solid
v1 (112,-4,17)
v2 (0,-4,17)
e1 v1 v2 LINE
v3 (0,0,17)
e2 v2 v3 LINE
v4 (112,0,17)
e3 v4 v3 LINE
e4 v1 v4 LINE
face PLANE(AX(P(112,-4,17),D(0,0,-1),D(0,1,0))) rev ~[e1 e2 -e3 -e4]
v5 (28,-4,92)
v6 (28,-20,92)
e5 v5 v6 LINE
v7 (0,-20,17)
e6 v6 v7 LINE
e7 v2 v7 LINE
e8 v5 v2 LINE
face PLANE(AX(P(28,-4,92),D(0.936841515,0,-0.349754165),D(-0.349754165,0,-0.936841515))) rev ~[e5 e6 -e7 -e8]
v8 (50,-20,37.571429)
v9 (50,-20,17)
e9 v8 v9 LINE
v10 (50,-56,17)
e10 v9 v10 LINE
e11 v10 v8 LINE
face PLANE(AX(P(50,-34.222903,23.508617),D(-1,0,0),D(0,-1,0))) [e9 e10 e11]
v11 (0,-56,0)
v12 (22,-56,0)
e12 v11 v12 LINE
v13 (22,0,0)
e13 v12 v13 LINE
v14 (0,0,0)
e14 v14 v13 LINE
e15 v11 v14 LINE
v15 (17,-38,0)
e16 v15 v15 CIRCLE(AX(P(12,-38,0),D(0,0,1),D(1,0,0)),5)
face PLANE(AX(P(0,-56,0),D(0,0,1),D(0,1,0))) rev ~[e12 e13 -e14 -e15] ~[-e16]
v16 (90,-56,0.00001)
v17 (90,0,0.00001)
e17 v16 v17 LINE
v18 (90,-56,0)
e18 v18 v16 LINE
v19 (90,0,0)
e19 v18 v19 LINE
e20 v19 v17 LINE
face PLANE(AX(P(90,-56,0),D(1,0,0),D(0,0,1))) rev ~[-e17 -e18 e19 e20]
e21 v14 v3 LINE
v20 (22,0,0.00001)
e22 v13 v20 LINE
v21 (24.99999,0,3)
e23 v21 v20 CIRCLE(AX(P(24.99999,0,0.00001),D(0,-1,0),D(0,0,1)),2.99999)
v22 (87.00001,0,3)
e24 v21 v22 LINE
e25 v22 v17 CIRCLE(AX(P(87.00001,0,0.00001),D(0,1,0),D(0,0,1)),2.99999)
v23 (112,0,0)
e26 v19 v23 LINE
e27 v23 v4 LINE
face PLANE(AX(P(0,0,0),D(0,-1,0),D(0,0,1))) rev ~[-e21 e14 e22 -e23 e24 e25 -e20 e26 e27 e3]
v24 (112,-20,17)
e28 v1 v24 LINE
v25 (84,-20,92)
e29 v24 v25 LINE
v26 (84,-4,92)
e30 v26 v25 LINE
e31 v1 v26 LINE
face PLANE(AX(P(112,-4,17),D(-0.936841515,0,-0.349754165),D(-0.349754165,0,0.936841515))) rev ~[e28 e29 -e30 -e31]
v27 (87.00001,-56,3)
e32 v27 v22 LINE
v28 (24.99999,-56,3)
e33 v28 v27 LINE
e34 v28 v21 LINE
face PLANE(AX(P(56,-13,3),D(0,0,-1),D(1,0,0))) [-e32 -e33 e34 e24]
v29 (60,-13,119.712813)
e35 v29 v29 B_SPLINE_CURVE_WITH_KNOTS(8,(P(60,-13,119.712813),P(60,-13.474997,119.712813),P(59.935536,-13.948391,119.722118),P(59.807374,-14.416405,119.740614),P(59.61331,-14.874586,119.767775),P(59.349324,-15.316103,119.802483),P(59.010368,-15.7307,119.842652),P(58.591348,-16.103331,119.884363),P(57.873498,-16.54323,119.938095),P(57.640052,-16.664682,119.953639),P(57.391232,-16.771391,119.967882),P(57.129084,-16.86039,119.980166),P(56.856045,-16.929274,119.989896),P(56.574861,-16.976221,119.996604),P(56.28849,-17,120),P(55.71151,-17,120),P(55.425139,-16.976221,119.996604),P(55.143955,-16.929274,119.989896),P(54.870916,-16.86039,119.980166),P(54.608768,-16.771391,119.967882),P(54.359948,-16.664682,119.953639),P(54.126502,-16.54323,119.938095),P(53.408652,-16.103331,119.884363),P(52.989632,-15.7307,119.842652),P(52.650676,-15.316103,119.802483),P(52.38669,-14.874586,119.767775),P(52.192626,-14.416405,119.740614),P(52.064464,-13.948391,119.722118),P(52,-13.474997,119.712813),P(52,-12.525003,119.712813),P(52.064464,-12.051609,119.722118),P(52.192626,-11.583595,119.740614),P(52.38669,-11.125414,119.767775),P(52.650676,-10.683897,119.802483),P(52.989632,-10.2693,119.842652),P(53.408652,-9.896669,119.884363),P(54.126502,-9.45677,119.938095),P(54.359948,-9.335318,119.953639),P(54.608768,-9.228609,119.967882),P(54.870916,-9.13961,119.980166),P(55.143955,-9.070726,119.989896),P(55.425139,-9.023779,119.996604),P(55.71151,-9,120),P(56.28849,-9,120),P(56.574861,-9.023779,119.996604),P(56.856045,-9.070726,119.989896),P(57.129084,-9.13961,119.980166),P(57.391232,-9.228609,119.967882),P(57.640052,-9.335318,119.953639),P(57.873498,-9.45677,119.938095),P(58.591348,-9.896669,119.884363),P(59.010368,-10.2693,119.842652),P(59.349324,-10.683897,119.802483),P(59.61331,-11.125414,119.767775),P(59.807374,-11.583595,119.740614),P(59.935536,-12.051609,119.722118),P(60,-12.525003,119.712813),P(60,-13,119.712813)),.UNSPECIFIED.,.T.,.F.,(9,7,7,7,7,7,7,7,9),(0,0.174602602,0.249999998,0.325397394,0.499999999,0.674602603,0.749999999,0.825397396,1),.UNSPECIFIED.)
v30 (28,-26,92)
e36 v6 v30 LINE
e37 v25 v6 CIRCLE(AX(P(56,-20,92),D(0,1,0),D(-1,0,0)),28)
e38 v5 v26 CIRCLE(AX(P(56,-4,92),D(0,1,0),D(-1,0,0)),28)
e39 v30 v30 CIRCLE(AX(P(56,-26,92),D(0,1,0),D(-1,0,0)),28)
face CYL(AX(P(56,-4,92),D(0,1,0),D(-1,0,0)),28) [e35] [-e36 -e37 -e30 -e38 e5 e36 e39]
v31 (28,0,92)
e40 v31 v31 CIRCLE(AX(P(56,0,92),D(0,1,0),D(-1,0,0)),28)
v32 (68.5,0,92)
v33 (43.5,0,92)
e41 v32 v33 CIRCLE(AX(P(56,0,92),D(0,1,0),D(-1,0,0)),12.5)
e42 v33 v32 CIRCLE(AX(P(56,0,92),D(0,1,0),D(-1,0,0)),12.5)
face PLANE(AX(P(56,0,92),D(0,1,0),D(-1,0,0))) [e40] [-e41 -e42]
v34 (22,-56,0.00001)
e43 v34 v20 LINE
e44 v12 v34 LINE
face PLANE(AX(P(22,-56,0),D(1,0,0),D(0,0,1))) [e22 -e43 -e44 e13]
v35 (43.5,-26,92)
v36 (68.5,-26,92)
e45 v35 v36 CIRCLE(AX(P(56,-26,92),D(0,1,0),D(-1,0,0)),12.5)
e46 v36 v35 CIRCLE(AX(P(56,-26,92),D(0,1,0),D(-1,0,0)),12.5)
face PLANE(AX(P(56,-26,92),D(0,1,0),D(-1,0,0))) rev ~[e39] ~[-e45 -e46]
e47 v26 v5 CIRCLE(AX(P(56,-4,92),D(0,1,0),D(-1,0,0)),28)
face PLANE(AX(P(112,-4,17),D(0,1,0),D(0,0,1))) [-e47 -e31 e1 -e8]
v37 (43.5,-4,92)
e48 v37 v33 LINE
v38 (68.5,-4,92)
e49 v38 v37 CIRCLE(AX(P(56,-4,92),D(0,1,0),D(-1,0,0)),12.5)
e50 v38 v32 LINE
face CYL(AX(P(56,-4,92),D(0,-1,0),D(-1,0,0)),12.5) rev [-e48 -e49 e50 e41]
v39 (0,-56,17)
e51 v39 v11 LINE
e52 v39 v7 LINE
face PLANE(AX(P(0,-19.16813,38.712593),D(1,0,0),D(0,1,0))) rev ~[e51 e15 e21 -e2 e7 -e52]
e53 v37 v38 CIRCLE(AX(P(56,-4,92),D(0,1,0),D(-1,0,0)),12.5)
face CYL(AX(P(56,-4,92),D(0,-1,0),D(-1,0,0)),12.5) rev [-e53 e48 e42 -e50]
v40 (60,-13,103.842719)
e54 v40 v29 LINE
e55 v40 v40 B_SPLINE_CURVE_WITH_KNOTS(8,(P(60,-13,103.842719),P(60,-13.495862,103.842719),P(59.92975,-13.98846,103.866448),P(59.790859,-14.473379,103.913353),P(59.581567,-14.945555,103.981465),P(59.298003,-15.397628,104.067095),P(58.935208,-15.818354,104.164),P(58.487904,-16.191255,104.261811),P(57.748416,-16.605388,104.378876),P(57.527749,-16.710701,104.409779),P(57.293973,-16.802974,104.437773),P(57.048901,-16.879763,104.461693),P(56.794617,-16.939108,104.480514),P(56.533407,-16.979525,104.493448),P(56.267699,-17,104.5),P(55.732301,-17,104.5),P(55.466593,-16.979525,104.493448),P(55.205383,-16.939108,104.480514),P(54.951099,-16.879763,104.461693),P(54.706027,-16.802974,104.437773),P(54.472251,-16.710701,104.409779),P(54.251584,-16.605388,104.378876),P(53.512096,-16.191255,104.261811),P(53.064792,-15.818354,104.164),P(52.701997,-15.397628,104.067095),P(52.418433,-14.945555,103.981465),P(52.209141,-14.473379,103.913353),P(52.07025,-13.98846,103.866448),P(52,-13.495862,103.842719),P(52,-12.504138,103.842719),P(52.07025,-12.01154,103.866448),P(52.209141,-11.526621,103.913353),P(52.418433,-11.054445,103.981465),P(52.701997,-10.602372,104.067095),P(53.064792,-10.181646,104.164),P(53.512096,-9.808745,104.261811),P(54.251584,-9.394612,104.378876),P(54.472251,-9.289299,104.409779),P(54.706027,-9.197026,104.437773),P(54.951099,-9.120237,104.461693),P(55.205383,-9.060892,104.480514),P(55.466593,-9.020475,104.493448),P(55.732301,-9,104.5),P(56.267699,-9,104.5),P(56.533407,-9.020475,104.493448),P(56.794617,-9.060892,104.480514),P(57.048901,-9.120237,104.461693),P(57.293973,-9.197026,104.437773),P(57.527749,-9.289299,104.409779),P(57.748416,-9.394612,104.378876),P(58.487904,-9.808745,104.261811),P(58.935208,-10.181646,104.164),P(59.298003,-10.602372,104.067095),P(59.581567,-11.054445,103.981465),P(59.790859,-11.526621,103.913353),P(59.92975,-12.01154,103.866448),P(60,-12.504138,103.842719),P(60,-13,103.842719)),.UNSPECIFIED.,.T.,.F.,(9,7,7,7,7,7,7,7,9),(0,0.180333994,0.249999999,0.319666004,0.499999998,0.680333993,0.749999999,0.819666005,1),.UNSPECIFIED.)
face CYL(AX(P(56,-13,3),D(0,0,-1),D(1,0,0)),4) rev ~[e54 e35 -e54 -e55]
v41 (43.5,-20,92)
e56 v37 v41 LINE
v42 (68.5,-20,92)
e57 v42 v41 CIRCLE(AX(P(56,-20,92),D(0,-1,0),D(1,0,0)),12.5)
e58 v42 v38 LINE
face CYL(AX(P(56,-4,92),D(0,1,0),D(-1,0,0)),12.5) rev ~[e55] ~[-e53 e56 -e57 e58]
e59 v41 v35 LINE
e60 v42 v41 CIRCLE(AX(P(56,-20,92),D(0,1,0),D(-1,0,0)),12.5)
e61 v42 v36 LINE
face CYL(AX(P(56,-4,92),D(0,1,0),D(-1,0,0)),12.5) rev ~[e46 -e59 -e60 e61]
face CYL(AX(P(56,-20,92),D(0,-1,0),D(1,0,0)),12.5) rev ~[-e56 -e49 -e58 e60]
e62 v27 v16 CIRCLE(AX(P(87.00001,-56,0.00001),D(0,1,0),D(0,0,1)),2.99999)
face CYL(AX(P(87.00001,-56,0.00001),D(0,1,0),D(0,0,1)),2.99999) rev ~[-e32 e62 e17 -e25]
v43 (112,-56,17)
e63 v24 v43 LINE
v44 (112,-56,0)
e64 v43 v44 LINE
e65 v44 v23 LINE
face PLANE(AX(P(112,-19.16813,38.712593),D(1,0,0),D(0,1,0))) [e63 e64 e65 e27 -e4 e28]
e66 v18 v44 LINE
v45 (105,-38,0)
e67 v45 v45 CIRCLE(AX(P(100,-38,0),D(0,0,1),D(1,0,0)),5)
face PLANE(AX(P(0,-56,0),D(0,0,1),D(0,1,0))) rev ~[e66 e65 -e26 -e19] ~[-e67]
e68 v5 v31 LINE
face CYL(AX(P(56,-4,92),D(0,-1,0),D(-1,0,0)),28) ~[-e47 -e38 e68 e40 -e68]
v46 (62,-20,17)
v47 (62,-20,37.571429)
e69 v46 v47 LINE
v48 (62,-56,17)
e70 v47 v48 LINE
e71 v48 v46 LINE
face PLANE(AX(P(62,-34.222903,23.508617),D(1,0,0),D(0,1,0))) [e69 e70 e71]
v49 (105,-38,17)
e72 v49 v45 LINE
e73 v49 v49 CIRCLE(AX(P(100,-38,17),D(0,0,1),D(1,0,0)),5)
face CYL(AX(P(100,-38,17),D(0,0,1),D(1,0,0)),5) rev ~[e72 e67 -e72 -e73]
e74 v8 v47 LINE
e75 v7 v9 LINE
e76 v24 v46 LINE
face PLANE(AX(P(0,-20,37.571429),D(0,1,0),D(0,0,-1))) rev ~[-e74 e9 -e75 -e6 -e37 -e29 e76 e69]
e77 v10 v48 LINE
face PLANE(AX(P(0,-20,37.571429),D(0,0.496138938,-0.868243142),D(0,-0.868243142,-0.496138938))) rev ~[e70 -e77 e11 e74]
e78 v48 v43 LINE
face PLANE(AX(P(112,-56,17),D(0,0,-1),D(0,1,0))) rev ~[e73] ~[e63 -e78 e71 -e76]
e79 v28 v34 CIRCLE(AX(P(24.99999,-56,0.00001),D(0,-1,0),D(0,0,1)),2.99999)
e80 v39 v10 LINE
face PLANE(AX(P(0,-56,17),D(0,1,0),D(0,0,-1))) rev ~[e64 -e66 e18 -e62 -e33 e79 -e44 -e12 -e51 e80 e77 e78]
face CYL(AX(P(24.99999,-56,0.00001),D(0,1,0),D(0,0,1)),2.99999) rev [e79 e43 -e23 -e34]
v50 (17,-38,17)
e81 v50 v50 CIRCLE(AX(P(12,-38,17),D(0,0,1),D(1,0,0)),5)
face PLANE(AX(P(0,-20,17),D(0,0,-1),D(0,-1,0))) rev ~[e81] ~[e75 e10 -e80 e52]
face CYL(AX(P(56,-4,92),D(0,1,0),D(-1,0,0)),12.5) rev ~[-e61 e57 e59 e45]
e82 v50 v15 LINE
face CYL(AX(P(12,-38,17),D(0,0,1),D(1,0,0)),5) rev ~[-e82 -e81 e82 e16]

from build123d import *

# Parameters (mm, degrees)
F1_DEPTH       = 112
F2_W           = 4
F2_H           = 75
F3_DEPTH       = 112.001
F5_DEPTH       = 50
F7_DEPTH       = 50
F9_DEPTH       = 25
F8_R           = 12.5
F10_DEPTH      = 4
F10_DEPTH_BACK = 22
F12_W          = 68
F12_H          = 3
F13_DEPTH      = 56.001
F14_R          = 5
F15_DEPTH      = 25
F16_R          = 4
F17_DEPTH      = 117.001
F18_R          = 4
F19_DEPTH      = 80
F11_R          = 12.5
F20_DEPTH      = 25
F20_DEPTH_BACK = 25
F21_R          = 2.99999


# Not quite as in the source:
# - a fillet or chamfer is up to 0.001 mm smaller than in the source, because OpenCascade refuses the exact size
# - a feature names something its author has since deleted; it is built from what else it names


with BuildPart() as f1:
    # F0 (on Right) → F1 (new body)
    with BuildSketch(Plane.YZ):
        Polygon((-56, 0), (0, 0), (0, 49), (0, 92), (-20, 92), (-20, 37.5714285714), (-56, 17), align=None)
    extrude(amount=F1_DEPTH)

    # F2 (on face) → F3 (cut, through all)
    with BuildSketch(Plane.YZ.offset(112)):
        with Locations((-2, 54.5)):
            Rectangle(F2_W, F2_H)
    extrude(amount=-F3_DEPTH, mode=Mode.SUBTRACT)

    # F4 (on face) → F5 (cut)
    with BuildSketch(Plane.YZ.offset(112)):
        Polygon((-20, 37.5714285714), (-56, 17), (-20, 17), align=None)
    extrude(amount=-F5_DEPTH, mode=Mode.SUBTRACT)

    # F6 (on face) → F7 (cut)
    with BuildSketch(Plane(origin=(0, 0, 0), x_dir=(0, -1, 0), z_dir=(-1, 0, 0))):
        Polygon((20, 17), (56, 17), (20, 37.5714285714), align=None)
    extrude(amount=-F7_DEPTH, mode=Mode.SUBTRACT)

    # F8 (on face) → F9 (cut)
    with BuildSketch(Plane(origin=(0, -4, 0), x_dir=(-1, 0, 0), z_dir=(0, 1, 0))):
        Polygon((-112, 17), (-84, 92), (-112, 92), align=None)
        Polygon((0, 92), (-28, 92), (0, 17), align=None)
    extrude(amount=-F9_DEPTH, mode=Mode.SUBTRACT)

    # F8 (on face) → F10 (join, two sides)
    with BuildSketch(Plane(origin=(0, -4, 0), x_dir=(-1, 0, 0), z_dir=(0, 1, 0))) as f10_sk:
        with BuildLine():
            ThreePointArc((-84, 92), (-56, 64), (-28, 92))
            ThreePointArc((-28, 92), (-56, 120), (-84, 92))
        make_face()
        with Locations((-56, 92)):
            Circle(F8_R, mode=Mode.SUBTRACT)
    extrude(amount=F10_DEPTH)
    extrude(f10_sk.sketch, amount=-F10_DEPTH_BACK)

    # F12 (on face) → F13 (cut, through all)
    with BuildSketch(Plane.XZ.offset(56)):
        with Locations((56, 1.5)):
            Rectangle(F12_W, F12_H)
    extrude(amount=-F13_DEPTH, mode=Mode.SUBTRACT)

    # F14 (on face) → F15 (cut)
    with BuildSketch(Plane.XY.offset(17)):
        with Locations((12, -38)):
            Circle(F14_R)
        with Locations((100, -38)):
            Circle(F14_R)
    extrude(amount=-F15_DEPTH, mode=Mode.SUBTRACT)

    # F16 (on face) → F17 (cut, through all)
    with BuildSketch(Plane(origin=(0, 0, 3), x_dir=(1, 0, 0), z_dir=(0, 0, -1))):
        with Locations((56, 13)):
            Circle(F16_R)
    extrude(amount=-F17_DEPTH, mode=Mode.SUBTRACT)

    # F18 (on face) → F19 (join)
    with BuildSketch(Plane(origin=(0, 0, 3), x_dir=(1, 0, 0), z_dir=(0, 0, -1))):
        with Locations((56, 13)):
            Circle(F18_R)
    extrude(amount=-F19_DEPTH)

    # F11 (on face) → F20 (cut, two sides)
    with BuildSketch(Plane.XZ.offset(20)) as f20_sk:
        with Locations((56, 92)):
            Circle(F11_R)
    extrude(amount=-F20_DEPTH, mode=Mode.SUBTRACT)
    extrude(f20_sk.sketch, amount=F20_DEPTH_BACK, mode=Mode.SUBTRACT)

    # F21 (radius 3 in the source; OpenCascade refuses exactly that, so slightly less here)
    f21_edges = [f1.edges().sort_by_distance(p)[0] for p in [
        (22, -28, 3),
        (90, -28, 3),
    ]]
    fillet(f21_edges, radius=F21_R)


solid = f1.part
